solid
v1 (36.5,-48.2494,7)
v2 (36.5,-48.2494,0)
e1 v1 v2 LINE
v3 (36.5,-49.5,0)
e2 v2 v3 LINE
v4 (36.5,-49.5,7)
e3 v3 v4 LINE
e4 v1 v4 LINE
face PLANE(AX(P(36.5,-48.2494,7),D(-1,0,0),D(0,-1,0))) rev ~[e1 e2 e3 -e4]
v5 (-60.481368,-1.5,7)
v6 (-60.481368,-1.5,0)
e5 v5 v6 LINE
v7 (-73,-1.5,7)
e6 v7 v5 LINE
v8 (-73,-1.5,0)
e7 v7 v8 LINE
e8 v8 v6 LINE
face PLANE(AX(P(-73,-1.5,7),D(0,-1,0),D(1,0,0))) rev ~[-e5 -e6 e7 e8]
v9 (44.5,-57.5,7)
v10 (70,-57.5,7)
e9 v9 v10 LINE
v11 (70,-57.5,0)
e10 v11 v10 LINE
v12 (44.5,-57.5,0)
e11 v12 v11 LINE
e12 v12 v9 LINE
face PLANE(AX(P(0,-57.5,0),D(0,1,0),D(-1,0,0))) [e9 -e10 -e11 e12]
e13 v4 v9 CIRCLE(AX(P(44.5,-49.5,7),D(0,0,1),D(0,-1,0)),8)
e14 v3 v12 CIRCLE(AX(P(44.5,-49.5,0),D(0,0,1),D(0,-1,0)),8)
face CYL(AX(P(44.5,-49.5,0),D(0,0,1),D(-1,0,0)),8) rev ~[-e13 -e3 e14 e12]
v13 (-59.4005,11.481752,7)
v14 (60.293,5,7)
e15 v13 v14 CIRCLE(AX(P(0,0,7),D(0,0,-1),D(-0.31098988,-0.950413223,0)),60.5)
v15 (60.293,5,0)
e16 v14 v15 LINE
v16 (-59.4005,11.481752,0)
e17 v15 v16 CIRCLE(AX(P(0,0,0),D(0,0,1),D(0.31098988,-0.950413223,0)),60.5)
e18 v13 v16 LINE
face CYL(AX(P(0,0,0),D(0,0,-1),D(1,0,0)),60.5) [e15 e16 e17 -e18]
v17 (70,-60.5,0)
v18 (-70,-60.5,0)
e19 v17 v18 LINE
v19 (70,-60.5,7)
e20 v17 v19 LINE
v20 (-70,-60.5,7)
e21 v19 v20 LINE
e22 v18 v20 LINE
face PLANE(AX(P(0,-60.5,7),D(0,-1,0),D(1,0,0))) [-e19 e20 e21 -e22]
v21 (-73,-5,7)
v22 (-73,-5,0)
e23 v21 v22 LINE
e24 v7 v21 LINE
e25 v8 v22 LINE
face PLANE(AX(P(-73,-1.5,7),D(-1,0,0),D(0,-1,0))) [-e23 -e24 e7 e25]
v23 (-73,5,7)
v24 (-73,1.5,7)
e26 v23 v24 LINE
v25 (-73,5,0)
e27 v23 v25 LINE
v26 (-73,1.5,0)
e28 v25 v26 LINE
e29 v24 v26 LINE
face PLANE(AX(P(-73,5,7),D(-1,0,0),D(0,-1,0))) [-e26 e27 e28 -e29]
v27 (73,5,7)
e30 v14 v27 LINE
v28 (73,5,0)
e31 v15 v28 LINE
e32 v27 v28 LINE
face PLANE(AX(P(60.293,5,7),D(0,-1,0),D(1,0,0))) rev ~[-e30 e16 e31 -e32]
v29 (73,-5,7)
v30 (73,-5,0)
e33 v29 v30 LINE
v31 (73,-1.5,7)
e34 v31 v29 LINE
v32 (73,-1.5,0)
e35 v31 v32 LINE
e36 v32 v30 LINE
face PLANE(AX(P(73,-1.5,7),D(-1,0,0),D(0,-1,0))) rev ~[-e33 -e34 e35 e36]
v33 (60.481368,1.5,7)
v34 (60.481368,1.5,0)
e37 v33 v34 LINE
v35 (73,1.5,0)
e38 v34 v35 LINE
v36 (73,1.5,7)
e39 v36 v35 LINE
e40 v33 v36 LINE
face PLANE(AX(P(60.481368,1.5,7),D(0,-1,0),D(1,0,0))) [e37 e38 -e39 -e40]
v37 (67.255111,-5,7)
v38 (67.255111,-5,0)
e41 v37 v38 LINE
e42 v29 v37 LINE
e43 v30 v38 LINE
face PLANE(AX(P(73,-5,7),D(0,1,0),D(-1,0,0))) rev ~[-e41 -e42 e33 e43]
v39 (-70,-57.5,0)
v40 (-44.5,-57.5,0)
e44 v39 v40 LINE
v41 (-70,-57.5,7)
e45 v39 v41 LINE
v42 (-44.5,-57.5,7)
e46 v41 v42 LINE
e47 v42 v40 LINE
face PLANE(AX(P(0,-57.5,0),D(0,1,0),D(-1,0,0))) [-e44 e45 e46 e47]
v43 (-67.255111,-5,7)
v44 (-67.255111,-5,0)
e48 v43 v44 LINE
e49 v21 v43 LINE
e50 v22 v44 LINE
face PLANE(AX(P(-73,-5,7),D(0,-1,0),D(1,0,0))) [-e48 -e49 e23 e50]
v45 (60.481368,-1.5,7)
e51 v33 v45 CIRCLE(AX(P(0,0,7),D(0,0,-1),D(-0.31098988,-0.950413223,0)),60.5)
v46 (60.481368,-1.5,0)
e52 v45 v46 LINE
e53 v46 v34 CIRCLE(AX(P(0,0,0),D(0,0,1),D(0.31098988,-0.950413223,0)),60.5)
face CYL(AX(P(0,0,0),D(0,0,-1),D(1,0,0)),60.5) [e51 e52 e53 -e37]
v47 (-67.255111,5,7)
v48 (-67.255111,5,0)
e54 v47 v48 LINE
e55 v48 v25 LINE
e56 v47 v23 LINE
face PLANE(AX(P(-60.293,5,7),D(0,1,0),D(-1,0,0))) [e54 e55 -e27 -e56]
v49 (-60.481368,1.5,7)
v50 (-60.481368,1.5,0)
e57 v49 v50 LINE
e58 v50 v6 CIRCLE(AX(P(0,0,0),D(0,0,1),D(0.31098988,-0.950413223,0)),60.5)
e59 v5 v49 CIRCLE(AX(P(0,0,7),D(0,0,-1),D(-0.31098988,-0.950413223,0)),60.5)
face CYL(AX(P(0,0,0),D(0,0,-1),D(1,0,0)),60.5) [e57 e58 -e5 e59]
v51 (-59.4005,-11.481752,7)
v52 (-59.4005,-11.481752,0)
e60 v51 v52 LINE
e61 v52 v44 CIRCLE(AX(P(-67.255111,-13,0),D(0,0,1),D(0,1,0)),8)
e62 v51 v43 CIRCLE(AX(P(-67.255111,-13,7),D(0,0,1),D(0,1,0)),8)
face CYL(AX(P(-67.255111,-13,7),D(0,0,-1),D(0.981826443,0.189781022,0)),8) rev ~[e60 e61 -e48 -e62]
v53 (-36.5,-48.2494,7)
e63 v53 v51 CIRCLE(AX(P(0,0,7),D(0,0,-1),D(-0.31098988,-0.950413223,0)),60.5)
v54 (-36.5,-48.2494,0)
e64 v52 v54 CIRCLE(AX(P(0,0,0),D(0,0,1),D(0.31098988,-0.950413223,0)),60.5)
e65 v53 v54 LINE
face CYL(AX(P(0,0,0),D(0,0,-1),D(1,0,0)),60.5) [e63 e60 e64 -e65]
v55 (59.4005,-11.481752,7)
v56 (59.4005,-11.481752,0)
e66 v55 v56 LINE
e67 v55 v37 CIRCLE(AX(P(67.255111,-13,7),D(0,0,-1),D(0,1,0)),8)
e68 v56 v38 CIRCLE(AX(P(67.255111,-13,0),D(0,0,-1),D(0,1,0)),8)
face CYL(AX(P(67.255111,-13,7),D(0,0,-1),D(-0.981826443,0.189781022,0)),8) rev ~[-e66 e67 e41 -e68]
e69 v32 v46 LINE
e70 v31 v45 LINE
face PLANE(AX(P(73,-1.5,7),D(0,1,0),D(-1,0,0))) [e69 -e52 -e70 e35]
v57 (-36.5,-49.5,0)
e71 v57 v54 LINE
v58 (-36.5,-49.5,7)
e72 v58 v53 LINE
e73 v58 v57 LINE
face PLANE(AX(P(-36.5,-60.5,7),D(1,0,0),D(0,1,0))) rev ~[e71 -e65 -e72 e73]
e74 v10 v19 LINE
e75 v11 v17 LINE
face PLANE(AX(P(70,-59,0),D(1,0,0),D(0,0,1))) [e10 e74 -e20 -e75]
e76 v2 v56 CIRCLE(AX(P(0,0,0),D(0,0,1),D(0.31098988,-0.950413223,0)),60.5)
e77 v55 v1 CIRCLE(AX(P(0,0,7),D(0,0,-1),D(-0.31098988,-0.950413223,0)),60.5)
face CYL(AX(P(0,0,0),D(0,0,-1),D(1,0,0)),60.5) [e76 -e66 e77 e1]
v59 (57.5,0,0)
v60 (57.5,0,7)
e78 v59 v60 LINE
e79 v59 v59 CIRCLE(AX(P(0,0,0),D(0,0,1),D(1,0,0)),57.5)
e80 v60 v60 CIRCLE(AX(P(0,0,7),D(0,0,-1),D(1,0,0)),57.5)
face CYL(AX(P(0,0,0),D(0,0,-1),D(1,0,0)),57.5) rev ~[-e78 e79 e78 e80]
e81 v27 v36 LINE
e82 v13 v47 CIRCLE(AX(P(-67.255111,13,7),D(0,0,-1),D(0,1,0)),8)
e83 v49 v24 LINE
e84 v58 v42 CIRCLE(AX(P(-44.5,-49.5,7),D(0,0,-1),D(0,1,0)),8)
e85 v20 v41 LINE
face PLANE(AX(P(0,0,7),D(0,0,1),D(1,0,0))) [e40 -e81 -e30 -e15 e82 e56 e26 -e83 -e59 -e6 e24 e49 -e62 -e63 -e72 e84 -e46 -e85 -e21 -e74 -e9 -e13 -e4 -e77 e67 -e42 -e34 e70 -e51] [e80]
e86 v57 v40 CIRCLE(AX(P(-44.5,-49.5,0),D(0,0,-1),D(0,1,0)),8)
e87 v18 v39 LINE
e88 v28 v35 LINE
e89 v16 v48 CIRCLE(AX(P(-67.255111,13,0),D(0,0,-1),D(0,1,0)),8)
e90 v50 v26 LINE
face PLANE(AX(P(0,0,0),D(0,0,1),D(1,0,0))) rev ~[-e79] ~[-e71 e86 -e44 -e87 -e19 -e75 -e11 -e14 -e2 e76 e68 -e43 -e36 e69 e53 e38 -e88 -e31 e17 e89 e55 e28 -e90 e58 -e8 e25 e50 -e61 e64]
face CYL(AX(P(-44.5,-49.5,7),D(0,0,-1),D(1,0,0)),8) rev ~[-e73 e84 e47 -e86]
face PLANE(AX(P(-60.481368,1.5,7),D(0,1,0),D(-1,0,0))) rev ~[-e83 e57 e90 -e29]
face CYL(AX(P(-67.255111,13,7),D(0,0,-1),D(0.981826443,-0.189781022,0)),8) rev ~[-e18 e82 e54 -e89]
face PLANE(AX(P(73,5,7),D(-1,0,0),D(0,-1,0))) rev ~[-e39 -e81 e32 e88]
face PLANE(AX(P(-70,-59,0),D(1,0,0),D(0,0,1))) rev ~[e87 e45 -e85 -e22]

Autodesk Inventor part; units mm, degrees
ref_plane "YZ Plane" through (0, 0, 0) normal (1, 0, 0) x (0, 1, 0)
ref_plane "XY Plane" through (0, 0, 0) normal (0, 0, 1) x (1, 0, 0)
sketch "Sketch1" plane through (0, 0, 0) normal (0, 0, 1) x (1, 0, 0)
  circle A0 centre (0, 0) radius 57.5
  circle A1 centre (0, 0) radius 60.5
  dimension "d0" = 115
  dimension "d1" = 121
extrude "Extrusion1" add sketch "Sketch1" along normal blind 7
ref_plane "Work Plane1" through (0, -59, 0) normal (0, 1, 0) x (-1, 0, 0)
sketch "Sketch2" plane through (0, -59, 0) normal (0, 1, 0) x (-1, 0, 0)
  point P0 (0, 0)
sketch "Sketch3" plane through (0, -59, 0) normal (0, 1, 0) x (-1, 0, 0)
  line L0 (0, 0) -> (-70, 0)
  line L1 (-70, 0) -> (-70, 7)
  line L2 (-70, 7) -> (0, 7)
  line L3 (0, 7) -> (0, 0)
  line L4 (0, 0) -> (70, 0)
  line L5 (70, 0) -> (70, 7)
  line L6 (70, 7) -> (0, 7)
  dimension "d5" = 70
  dimension "d6" = 7
extrude "Extrusion2" add sketch "Sketch3" along normal mid plane 3
sketch "Sketch4" plane through (0, 0, 7) normal (0, 0, 1) x (1, 0, 0)
  line L0 (48, 5) -> (73, 5)
  line L1 (73, 5) -> (73, -5)
  line L2 (73, -5) -> (48, -5)
  line L3 (48, -5) -> (48, 5)
  line L4 (48, 5) -> (73, -5) construction
  line L5 (73, 5) -> (48, -5) construction
  line L6 (48, 1.5) -> (73, 1.5)
  line L7 (73, 1.5) -> (73, -1.5)
  line L8 (73, -1.5) -> (48, -1.5)
  line L9 (48, -1.5) -> (48, 1.5)
  line L10 (48, 1.5) -> (73, -1.5) construction
  line L11 (73, 1.5) -> (48, -1.5) construction
  line L12 (0, 0) -> (0, -12.7)
  line L13 (-48, 5) -> (-73, 5)
  line L14 (-73, 5) -> (-73, -5)
  line L15 (-73, -5) -> (-48, -5)
  line L16 (-48, -5) -> (-48, 5)
  line L17 (-48, 5) -> (-73, -5) construction
  line L18 (-73, 5) -> (-48, -5) construction
  line L19 (-48, 1.5) -> (-73, 1.5)
  line L20 (-73, 1.5) -> (-73, -1.5)
  line L21 (-73, -1.5) -> (-48, -1.5)
  line L22 (-48, -1.5) -> (-48, 1.5)
  line L23 (-48, 1.5) -> (-73, -1.5) construction
  line L24 (-73, 1.5) -> (-48, -1.5) construction
  line L25 (-70, -60.5) -> (70, -60.5) projected
  line L26 (36.5, -75) -> (-36.5, -75)
  line L27 (-36.5, -75) -> (-36.5, -46)
  line L28 (-36.5, -46) -> (36.5, -46)
  line L29 (36.5, -46) -> (36.5, -75)
  line L30 (36.5, -75) -> (-36.5, -46) construction
  line L31 (-36.5, -75) -> (36.5, -46) construction
  line L32 (36.5, -60.5) -> (-36.5, -60.5)
  arc A0 (60.293, -5) -> (60.293, 5) centre (0, 0) ccw
  arc A1 (-60.293, 5) -> (-60.293, -5) centre (0, 0) ccw
  arc A2 (-36.5, -48.2494) -> (36.5, -48.2494) centre (0, 0) ccw
  point P0 (60.5, 0)
  point P1 (60.5, 0)
  point P2 (-60.5, 0)
  point P3 (-60.5, 0)
  point P4 (0, -60.5)
  point P5 (-60.4814, -1.5)
  point P6 (-60.4814, 1.5)
  point P7 (0, -60.5)
  point P8 (60.4814, -1.5)
  point P9 (60.4814, 1.5)
  dimension "d10" = 25
  dimension "d11" = 10
  dimension "d12" = 25
  dimension "d13" = 3
  dimension "d17" = 73
  dimension "d18" = 29
extrude "Extrusion3" add sketch "Sketch4" against normal blind 7 contours L0 L1 L6 A0 | L8 L1 L2 A0 | A1 L19 L14 L13 | A1 L15 L14 L21 | L27 A2 L25 | A2 L29 L25
fillet "Fillet1" radius 8 5 edges at (-60.293, -5, 3.5) (-60.293, 5, 3.5) (60.293, -5, 3.5) (36.5, -57.5, 3.5) (-36.5, -57.5, 3.5)
properties part number "EXTRA_PARA CORTE DE TUBO"
